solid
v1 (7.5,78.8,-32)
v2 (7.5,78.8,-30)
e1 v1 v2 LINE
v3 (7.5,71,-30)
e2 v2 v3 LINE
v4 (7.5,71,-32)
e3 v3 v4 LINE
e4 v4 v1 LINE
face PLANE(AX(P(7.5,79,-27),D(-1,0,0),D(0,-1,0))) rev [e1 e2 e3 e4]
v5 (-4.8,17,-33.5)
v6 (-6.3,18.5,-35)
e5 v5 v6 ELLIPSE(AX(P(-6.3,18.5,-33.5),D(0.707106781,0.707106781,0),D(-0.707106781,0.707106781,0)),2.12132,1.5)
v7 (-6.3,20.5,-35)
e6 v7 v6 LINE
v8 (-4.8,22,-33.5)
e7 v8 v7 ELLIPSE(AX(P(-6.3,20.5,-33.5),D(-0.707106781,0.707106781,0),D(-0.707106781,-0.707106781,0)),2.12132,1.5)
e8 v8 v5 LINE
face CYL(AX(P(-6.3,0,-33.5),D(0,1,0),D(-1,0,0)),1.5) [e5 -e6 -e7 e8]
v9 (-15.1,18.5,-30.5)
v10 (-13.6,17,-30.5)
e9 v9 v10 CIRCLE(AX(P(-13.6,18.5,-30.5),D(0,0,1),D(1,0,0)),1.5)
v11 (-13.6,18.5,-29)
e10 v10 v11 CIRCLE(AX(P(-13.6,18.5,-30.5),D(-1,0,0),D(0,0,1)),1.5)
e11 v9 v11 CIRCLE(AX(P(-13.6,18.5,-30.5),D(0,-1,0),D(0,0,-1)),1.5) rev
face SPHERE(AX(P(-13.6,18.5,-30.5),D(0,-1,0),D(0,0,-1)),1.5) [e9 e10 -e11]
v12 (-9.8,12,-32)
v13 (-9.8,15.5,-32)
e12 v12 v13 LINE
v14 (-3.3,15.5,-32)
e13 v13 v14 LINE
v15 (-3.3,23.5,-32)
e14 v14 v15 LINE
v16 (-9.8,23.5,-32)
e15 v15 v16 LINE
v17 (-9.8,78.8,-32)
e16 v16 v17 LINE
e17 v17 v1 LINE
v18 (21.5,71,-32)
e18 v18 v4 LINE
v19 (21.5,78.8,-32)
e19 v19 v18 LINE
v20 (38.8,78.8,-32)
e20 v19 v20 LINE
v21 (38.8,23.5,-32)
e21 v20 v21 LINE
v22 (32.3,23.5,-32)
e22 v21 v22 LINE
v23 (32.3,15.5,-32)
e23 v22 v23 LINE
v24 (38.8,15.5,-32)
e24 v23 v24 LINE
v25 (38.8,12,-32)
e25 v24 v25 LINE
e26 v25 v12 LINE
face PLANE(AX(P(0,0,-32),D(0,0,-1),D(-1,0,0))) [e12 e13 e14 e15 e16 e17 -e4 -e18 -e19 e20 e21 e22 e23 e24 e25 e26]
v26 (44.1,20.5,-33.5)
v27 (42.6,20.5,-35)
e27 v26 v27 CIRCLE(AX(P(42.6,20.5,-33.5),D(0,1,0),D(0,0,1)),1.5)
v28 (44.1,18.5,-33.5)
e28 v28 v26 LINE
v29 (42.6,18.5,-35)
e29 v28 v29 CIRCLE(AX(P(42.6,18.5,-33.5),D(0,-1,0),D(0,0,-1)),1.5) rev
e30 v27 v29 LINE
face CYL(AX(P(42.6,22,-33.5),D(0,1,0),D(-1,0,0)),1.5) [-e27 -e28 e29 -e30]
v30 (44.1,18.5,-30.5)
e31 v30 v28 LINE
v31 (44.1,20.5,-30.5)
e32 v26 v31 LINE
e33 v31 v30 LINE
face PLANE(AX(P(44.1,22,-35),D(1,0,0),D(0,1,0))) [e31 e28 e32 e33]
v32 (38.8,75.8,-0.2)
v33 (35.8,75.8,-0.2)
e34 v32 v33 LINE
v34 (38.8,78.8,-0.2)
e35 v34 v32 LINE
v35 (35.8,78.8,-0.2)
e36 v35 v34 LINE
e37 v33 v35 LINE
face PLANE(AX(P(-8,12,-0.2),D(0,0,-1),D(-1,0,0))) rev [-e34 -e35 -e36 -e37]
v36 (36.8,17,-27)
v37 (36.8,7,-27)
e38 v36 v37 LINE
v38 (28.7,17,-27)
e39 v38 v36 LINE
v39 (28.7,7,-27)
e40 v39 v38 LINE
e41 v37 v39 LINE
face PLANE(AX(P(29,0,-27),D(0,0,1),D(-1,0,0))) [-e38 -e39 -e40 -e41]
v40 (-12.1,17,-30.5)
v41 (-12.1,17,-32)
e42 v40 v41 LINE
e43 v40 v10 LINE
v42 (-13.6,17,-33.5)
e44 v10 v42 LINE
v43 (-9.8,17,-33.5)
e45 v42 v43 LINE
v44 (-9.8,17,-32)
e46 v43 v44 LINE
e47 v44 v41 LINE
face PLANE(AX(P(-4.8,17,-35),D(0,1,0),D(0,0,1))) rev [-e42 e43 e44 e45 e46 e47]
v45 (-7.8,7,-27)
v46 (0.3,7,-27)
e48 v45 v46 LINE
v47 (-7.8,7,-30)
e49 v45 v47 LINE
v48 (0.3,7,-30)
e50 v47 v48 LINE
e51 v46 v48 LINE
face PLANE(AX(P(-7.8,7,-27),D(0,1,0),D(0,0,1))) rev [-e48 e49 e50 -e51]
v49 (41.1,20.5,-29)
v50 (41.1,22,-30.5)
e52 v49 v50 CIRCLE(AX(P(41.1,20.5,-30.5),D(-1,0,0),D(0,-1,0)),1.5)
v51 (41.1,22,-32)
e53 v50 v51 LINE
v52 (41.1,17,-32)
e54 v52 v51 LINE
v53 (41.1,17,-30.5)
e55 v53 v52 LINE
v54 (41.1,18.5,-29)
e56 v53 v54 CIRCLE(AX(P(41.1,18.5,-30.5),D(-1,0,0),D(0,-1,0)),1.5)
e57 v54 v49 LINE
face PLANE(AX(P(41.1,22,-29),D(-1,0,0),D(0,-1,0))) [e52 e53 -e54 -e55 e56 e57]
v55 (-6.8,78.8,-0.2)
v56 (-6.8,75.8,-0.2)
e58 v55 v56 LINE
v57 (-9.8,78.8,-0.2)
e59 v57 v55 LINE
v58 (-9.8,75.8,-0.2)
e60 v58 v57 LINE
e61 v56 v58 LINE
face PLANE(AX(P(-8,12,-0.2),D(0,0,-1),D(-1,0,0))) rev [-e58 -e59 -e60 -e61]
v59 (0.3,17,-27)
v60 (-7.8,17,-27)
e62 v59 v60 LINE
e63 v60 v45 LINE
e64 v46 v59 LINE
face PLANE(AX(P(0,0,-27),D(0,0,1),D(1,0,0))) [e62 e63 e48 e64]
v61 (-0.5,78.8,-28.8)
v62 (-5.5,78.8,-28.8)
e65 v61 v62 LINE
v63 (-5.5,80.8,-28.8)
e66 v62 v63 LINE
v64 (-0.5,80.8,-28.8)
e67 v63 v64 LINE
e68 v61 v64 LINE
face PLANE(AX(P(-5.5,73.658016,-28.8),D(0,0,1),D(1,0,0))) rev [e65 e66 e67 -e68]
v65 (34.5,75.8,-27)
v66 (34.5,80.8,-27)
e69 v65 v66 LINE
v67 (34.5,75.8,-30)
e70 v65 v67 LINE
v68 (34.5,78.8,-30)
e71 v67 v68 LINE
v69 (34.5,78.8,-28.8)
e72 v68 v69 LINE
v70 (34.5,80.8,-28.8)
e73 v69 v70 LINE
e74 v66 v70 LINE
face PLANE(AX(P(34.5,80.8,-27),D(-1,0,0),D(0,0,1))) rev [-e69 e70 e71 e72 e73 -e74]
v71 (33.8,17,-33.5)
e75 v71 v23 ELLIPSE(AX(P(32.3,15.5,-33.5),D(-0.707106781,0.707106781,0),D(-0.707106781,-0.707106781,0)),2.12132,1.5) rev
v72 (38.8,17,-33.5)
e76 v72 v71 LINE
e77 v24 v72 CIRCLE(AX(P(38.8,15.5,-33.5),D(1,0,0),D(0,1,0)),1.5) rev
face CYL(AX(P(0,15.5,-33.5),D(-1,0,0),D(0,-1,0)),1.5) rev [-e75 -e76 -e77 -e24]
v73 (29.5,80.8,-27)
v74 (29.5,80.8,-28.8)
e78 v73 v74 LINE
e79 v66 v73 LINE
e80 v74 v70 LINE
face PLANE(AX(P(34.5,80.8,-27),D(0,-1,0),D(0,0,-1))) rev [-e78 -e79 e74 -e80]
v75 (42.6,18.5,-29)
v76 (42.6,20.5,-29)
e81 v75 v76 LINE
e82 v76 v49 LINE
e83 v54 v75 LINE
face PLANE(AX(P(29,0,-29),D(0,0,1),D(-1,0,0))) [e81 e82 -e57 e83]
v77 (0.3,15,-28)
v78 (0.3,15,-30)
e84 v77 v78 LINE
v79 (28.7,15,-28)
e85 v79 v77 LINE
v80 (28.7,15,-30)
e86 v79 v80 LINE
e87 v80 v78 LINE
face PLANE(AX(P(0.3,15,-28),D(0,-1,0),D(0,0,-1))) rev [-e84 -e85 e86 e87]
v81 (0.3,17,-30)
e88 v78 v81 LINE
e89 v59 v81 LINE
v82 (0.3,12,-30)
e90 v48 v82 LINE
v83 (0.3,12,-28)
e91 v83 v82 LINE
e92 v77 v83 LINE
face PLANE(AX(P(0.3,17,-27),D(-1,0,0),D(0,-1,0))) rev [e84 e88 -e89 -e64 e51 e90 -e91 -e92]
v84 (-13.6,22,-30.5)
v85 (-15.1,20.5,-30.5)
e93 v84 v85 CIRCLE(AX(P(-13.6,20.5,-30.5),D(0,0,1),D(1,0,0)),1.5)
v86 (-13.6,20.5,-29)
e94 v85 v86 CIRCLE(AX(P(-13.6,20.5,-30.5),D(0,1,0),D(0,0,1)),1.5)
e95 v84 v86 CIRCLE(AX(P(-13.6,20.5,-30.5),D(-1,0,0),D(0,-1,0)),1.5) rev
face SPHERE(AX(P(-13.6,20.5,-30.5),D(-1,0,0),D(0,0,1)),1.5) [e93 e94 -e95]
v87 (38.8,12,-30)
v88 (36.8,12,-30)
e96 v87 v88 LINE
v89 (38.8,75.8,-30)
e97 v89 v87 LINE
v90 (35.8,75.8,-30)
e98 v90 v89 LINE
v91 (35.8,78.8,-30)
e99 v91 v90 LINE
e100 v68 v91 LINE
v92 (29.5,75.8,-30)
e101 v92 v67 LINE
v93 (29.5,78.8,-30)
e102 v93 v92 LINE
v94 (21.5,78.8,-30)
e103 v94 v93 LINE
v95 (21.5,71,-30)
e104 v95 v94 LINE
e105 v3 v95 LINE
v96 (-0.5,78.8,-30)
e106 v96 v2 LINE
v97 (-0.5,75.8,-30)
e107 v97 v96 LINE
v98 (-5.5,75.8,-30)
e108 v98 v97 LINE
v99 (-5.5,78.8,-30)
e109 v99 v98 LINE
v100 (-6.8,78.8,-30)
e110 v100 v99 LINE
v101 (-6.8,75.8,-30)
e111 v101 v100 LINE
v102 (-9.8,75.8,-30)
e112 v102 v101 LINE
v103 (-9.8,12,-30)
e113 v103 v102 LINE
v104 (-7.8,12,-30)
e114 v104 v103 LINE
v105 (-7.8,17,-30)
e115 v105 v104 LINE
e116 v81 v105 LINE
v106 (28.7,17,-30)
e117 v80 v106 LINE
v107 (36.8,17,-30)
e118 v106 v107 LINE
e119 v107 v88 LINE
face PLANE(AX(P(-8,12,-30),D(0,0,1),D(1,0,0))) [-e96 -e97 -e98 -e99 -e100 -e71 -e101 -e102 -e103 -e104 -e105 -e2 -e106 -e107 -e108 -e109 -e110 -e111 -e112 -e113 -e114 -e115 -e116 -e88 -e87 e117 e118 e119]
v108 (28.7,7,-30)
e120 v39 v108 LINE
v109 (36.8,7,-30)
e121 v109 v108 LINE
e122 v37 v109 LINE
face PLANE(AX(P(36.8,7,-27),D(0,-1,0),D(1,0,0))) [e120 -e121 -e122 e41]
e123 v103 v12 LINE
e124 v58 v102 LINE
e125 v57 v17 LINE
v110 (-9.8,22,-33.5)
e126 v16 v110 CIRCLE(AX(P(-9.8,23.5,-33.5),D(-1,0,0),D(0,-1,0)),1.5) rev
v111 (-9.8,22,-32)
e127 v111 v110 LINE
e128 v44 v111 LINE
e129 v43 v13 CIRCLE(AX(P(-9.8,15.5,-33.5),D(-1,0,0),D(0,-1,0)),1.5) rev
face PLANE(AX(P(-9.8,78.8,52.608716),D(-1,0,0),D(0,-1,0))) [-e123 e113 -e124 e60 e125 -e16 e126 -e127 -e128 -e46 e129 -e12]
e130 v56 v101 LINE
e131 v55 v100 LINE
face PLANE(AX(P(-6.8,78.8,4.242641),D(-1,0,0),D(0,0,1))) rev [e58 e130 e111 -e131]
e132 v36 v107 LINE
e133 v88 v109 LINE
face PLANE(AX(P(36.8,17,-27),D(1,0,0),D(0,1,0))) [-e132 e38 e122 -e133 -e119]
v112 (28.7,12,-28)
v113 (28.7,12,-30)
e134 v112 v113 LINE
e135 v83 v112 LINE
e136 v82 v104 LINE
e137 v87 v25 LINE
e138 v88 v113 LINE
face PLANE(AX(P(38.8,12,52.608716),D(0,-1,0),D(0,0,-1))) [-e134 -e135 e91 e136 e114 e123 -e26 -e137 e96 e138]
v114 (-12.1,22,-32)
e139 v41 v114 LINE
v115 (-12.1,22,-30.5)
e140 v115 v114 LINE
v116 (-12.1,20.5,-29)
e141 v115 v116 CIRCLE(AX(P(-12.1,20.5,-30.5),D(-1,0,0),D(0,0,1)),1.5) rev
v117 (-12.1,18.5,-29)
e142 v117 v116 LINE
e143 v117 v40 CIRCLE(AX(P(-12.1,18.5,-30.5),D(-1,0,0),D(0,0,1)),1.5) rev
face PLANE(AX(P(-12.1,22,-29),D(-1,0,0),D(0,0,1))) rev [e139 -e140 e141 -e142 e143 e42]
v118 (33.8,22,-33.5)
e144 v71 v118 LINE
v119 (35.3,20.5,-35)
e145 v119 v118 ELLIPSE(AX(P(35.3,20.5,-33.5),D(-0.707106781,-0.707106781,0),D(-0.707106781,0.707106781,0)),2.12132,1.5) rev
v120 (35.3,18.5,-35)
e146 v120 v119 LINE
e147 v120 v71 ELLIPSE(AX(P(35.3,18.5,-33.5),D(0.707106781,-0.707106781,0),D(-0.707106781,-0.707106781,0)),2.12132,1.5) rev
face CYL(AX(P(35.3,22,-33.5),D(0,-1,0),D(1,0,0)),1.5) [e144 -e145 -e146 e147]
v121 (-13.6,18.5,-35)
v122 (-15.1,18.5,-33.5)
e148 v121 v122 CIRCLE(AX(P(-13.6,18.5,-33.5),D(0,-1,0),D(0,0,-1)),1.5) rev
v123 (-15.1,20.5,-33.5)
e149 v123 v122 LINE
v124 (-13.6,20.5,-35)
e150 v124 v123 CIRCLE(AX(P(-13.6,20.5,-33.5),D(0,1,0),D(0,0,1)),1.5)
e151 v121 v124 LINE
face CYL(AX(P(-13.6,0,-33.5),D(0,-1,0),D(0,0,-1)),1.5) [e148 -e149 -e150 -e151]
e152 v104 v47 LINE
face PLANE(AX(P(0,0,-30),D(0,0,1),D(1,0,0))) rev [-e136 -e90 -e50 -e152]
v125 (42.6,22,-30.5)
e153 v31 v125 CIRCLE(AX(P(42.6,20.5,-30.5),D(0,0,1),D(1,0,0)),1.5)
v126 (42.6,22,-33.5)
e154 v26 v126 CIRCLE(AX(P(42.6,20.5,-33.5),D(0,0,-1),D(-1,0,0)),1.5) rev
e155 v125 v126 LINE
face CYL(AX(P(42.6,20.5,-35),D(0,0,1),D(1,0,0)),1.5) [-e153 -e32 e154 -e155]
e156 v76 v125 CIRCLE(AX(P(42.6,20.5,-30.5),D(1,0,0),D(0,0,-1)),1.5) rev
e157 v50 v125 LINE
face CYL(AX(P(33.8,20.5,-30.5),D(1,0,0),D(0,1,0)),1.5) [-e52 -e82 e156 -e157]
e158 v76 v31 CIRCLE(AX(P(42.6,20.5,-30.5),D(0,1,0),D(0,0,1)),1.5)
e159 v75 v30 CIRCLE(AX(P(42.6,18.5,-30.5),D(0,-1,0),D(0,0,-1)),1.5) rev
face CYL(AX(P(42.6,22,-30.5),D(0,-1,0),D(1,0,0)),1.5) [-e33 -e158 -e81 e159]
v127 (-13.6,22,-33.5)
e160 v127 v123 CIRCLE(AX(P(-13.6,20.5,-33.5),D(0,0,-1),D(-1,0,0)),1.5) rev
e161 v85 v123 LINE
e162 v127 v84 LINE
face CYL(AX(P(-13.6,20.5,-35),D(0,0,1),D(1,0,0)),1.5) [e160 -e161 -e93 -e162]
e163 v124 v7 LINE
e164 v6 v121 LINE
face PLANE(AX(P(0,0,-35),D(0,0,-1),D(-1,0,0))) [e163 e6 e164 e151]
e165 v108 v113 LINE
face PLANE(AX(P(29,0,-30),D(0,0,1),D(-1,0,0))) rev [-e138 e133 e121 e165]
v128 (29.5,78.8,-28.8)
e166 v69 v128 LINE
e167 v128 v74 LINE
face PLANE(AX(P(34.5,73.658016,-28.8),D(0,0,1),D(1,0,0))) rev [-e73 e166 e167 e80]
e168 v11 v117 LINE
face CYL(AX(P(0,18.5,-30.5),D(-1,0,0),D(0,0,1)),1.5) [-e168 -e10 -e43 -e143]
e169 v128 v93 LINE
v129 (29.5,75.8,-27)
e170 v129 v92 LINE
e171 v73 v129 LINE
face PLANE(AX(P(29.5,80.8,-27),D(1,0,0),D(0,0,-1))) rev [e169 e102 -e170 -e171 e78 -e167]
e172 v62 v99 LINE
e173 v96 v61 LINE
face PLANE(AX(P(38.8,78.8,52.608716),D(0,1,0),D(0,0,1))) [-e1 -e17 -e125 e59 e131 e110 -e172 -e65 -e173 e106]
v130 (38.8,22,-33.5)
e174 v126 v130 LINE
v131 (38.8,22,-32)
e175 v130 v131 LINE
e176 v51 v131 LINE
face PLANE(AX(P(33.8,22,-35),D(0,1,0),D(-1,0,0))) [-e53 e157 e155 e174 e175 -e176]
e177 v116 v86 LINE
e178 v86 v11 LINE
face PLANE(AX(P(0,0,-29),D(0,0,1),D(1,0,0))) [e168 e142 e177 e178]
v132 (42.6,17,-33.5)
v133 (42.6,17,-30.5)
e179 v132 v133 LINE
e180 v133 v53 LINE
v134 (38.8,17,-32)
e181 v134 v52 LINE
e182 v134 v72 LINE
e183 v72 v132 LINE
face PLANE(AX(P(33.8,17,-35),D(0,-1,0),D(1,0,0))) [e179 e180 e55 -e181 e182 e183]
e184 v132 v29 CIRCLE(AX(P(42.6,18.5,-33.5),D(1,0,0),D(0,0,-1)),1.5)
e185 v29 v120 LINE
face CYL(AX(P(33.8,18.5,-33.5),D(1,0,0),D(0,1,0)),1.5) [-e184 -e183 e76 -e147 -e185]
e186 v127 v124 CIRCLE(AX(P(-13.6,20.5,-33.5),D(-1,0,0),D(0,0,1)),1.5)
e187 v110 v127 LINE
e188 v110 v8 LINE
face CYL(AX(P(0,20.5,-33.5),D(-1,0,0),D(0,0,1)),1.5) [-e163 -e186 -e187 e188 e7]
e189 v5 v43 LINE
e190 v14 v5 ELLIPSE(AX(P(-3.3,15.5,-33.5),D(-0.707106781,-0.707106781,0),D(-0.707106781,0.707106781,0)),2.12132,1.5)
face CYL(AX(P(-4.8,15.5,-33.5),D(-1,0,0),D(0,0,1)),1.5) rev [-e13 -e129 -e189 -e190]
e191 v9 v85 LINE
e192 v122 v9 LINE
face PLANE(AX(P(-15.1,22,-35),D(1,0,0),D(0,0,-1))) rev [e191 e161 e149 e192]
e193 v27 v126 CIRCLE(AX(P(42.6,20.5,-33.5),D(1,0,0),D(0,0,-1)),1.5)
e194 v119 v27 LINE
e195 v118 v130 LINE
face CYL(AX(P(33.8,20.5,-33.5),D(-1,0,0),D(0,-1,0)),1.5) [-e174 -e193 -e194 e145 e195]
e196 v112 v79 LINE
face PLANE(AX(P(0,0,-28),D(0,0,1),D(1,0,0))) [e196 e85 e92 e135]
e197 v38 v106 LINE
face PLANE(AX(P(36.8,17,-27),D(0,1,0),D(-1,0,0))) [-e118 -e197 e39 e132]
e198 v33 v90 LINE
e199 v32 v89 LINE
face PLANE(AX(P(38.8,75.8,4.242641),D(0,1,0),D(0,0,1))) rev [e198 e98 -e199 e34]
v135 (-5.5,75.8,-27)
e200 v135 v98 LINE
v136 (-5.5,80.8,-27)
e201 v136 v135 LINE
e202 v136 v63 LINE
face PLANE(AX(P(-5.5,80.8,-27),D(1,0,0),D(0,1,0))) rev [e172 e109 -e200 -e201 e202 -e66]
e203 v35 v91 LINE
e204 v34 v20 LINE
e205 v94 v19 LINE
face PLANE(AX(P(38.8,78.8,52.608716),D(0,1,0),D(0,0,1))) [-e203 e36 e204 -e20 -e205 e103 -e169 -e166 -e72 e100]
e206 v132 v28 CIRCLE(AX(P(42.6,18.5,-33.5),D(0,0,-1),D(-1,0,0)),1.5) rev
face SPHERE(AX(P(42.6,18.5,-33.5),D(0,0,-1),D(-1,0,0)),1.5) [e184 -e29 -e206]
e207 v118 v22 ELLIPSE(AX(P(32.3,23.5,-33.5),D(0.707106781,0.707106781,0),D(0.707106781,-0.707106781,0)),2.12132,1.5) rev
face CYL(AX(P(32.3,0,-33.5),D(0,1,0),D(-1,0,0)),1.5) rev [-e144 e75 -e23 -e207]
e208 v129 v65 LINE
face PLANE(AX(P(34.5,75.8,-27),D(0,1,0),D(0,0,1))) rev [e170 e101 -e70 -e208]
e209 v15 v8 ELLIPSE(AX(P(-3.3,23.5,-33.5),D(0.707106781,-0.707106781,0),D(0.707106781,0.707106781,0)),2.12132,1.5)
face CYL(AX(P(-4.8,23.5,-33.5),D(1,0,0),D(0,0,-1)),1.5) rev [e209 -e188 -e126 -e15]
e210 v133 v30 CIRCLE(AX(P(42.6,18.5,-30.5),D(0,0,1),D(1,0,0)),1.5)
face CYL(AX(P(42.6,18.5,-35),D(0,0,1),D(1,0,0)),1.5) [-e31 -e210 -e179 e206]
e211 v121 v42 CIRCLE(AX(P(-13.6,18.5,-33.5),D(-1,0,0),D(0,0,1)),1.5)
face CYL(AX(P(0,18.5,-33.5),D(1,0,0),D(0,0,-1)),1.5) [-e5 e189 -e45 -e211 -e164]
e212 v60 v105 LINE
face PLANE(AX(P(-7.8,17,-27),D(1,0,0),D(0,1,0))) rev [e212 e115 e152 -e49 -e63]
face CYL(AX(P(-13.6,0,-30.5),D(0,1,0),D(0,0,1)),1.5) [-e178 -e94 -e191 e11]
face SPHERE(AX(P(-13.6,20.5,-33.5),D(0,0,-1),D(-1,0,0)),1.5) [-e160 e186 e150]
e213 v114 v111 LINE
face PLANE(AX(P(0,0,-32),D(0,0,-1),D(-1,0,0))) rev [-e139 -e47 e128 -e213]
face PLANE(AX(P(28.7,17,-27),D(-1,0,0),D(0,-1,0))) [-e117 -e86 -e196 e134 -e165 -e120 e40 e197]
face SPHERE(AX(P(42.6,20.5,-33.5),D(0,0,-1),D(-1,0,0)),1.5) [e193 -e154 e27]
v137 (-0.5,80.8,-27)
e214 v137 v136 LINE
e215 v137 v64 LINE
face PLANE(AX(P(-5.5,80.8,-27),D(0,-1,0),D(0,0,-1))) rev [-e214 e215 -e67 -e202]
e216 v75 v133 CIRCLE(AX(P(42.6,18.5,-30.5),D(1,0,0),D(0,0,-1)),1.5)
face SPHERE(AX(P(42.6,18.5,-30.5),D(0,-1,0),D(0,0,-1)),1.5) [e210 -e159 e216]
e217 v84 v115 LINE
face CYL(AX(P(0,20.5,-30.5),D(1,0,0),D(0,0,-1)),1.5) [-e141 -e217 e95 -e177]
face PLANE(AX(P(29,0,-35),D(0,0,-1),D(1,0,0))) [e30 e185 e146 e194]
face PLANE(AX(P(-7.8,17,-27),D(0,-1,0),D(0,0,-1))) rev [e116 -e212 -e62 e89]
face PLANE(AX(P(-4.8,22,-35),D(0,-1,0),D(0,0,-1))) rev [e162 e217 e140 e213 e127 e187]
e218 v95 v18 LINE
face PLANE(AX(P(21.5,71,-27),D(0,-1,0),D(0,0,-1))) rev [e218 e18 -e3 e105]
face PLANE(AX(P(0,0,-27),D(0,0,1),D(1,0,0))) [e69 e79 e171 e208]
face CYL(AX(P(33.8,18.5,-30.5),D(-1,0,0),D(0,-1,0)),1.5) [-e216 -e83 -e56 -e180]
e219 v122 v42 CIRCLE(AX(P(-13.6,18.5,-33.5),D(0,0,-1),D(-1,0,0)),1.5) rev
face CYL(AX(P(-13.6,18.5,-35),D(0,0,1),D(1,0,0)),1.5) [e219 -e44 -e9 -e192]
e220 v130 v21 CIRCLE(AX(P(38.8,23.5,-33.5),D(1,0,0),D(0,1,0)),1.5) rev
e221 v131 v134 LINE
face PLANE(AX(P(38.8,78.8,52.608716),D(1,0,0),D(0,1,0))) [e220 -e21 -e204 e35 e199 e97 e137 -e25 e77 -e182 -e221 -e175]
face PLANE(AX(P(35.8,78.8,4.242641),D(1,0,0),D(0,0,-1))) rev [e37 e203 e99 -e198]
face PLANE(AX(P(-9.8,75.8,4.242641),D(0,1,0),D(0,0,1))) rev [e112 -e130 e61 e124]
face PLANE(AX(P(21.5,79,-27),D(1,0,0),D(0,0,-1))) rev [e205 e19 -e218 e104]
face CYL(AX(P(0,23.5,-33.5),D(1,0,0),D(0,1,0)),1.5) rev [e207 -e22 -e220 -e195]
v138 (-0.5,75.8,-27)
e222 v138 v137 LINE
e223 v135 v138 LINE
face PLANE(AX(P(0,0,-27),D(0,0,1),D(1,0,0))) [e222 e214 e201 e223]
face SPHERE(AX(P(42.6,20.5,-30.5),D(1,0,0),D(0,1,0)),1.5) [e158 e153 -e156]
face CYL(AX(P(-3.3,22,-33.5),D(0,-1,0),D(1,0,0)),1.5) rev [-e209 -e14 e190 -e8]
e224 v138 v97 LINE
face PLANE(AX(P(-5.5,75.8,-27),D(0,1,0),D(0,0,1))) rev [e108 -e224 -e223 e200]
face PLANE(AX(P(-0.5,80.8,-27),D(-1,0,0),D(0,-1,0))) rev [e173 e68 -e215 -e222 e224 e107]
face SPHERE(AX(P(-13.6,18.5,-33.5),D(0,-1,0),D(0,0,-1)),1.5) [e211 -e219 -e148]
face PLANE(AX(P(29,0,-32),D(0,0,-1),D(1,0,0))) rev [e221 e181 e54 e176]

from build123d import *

# Parameters (mm, degrees)
SKETCH_1_W             = 48.6
SKETCH_1_H             = 66.8
EXTRUDE_1_DEPTH        = 2
SKETCH_2_W             = 8.1
SKETCH_2_H             = 10
EXTRUDE_2_DEPTH        = 3
SKETCH_3_W             = 28.4
SKETCH_3_H             = 3
EXTRUDE_3_DEPTH        = 2
SKETCH_4_W             = 14
SKETCH_4_H             = 8
CUT_EXTRUDE_1_DEPTH    = 88.976587795
SKETCH_5_W             = 5
SKETCH_5_H             = 5
EXTRUDE_4_DEPTH        = 3
SKETCH_6_W             = 5
SKETCH_6_H             = 1.2
CUT_EXTRUDE_2_DEPTH    = 2
SKETCH_7_W             = 3
SKETCH_7_H             = 3
EXTRUDE_5_DEPTH        = 29.8
SKETCH_8_W             = 10.3
SKETCH_8_H             = 5
EXTRUDE_6_DEPTH        = 3
SKETCH_9_W             = 3
SKETCH_9_H             = 5
EXTRUDE_7_DEPTH        = 3
FILLET_1_R             = 1.5
FILLET_1_OF_MIRROR_2_R = 1.5


with BuildPart() as part:
    # 草图1 → 凸台-拉伸1 (new body)
    with BuildSketch(Plane(origin=(0, 0, -32), x_dir=(-1, 0, 0), z_dir=(0, 0, -1))):
        with Locations((-14.5, 45.4)):
            Rectangle(SKETCH_1_W, SKETCH_1_H)
    extrude(amount=-EXTRUDE_1_DEPTH)

    # 草图2 → 凸台-拉伸2 (add)
    with BuildSketch(Plane.XY.offset(-30)):
        with Locations((-3.75, 12)):
            Rectangle(SKETCH_2_W, SKETCH_2_H)
    extrude_2 = extrude(amount=EXTRUDE_2_DEPTH)

    # 镜向1: 凸台-拉伸2 across plane
    add(extrude_2.mirror(Plane.ZY.offset(-14.5)))

    # 草图3 → 凸台-拉伸3 (add)
    with BuildSketch(Plane.XY.offset(-30)):
        with Locations((14.5, 13.5)):
            Rectangle(SKETCH_3_W, SKETCH_3_H)
    extrude(amount=EXTRUDE_3_DEPTH)

    # 草图4 → 切除-拉伸1 (cut, through all)
    with BuildSketch(Plane(origin=(0, 0, -32), x_dir=(-1, 0, 0), z_dir=(0, 0, -1))):
        with Locations((-14.5, 75)):
            Rectangle(SKETCH_4_W, SKETCH_4_H)
    extrude(amount=-CUT_EXTRUDE_1_DEPTH, mode=Mode.SUBTRACT)

    # 草图5 → 凸台-拉伸4 (add)
    with BuildSketch(Plane.XY.offset(-30)):
        with Locations((-3, 78.3)):
            Rectangle(SKETCH_5_W, SKETCH_5_H)
        with Locations((32, 78.3)):
            Rectangle(SKETCH_5_W, SKETCH_5_H)
    extrude(amount=EXTRUDE_4_DEPTH)

    # 草图6 → 切除-拉伸2 (cut)
    with BuildSketch(Plane(origin=(0, 80.8, 0), x_dir=(1, 0, 0), z_dir=(0, 1, 0))):
        with Locations((-3, 29.4)):
            Rectangle(SKETCH_6_W, SKETCH_6_H)
        with Locations((32, 29.4)):
            Rectangle(SKETCH_6_W, SKETCH_6_H)
    extrude(amount=-CUT_EXTRUDE_2_DEPTH, mode=Mode.SUBTRACT)

    # 草图7 → 凸台-拉伸5 (add)
    with BuildSketch(Plane.XY.offset(-30)):
        with Locations((-8.3, 77.3)):
            Rectangle(SKETCH_7_W, SKETCH_7_H)
        with Locations((37.3, 77.3)):
            Rectangle(SKETCH_7_W, SKETCH_7_H)
    extrude(amount=EXTRUDE_5_DEPTH)

    # 草图8 → 凸台-拉伸6 (add)
    with BuildSketch(Plane(origin=(0, 0, -32), x_dir=(-1, 0, 0), z_dir=(0, 0, -1))):
        with Locations((9.95, 19.5)):
            Rectangle(SKETCH_8_W, SKETCH_8_H)
    extrude_6 = extrude(amount=EXTRUDE_6_DEPTH)

    # 草图9 → 凸台-拉伸7 (add)
    with BuildSketch(Plane.XY.offset(-32)):
        with Locations((-13.6, 19.5)):
            Rectangle(SKETCH_9_W, SKETCH_9_H)
    extrude_7 = extrude(amount=EXTRUDE_7_DEPTH)

    # 圆角1
    fillet_1_edges = [part.edges().sort_by_distance(p)[0] for p in [
        (-15.1, 19.5, -29),
        (-15.1, 22, -32),
        (-15.1, 17, -32),
        (-4.8, 19.5, -32),
        (-7.3, 17, -32),
        (-9.95, 17, -35),
        (-4.8, 19.5, -35),
        (-7.3, 22, -32),
        (-9.95, 22, -35),
        (-15.1, 19.5, -35),
        (-13.6, 22, -29),
        (-13.6, 17, -29),
    ]]
    fillet(fillet_1_edges, radius=FILLET_1_R - 0.0001)  # a hair under: the kernel refuses the full size

    # 镜向2: 凸台-拉伸6, 凸台-拉伸7 across plane
    add(extrude_6.mirror(Plane.ZY.offset(-14.5)))
    add(extrude_7.mirror(Plane.ZY.offset(-14.5)))

    # 圆角1 of 镜向2
    fillet_1_of_mirror_2_edges = [part.edges().sort_by_distance(p)[0] for p in [
        (44.1, 19.5, -29),
        (44.1, 22, -32),
        (44.1, 17, -32),
        (33.8, 19.5, -32),
        (36.3, 17, -32),
        (38.95, 17, -35),
        (33.8, 19.5, -35),
        (36.3, 22, -32),
        (38.95, 22, -35),
        (44.1, 19.5, -35),
        (42.6, 22, -29),
        (42.6, 17, -29),
    ]]
    fillet(fillet_1_of_mirror_2_edges, radius=FILLET_1_OF_MIRROR_2_R - 0.0001)  # a hair under: the kernel refuses the full size


solid = part.part
